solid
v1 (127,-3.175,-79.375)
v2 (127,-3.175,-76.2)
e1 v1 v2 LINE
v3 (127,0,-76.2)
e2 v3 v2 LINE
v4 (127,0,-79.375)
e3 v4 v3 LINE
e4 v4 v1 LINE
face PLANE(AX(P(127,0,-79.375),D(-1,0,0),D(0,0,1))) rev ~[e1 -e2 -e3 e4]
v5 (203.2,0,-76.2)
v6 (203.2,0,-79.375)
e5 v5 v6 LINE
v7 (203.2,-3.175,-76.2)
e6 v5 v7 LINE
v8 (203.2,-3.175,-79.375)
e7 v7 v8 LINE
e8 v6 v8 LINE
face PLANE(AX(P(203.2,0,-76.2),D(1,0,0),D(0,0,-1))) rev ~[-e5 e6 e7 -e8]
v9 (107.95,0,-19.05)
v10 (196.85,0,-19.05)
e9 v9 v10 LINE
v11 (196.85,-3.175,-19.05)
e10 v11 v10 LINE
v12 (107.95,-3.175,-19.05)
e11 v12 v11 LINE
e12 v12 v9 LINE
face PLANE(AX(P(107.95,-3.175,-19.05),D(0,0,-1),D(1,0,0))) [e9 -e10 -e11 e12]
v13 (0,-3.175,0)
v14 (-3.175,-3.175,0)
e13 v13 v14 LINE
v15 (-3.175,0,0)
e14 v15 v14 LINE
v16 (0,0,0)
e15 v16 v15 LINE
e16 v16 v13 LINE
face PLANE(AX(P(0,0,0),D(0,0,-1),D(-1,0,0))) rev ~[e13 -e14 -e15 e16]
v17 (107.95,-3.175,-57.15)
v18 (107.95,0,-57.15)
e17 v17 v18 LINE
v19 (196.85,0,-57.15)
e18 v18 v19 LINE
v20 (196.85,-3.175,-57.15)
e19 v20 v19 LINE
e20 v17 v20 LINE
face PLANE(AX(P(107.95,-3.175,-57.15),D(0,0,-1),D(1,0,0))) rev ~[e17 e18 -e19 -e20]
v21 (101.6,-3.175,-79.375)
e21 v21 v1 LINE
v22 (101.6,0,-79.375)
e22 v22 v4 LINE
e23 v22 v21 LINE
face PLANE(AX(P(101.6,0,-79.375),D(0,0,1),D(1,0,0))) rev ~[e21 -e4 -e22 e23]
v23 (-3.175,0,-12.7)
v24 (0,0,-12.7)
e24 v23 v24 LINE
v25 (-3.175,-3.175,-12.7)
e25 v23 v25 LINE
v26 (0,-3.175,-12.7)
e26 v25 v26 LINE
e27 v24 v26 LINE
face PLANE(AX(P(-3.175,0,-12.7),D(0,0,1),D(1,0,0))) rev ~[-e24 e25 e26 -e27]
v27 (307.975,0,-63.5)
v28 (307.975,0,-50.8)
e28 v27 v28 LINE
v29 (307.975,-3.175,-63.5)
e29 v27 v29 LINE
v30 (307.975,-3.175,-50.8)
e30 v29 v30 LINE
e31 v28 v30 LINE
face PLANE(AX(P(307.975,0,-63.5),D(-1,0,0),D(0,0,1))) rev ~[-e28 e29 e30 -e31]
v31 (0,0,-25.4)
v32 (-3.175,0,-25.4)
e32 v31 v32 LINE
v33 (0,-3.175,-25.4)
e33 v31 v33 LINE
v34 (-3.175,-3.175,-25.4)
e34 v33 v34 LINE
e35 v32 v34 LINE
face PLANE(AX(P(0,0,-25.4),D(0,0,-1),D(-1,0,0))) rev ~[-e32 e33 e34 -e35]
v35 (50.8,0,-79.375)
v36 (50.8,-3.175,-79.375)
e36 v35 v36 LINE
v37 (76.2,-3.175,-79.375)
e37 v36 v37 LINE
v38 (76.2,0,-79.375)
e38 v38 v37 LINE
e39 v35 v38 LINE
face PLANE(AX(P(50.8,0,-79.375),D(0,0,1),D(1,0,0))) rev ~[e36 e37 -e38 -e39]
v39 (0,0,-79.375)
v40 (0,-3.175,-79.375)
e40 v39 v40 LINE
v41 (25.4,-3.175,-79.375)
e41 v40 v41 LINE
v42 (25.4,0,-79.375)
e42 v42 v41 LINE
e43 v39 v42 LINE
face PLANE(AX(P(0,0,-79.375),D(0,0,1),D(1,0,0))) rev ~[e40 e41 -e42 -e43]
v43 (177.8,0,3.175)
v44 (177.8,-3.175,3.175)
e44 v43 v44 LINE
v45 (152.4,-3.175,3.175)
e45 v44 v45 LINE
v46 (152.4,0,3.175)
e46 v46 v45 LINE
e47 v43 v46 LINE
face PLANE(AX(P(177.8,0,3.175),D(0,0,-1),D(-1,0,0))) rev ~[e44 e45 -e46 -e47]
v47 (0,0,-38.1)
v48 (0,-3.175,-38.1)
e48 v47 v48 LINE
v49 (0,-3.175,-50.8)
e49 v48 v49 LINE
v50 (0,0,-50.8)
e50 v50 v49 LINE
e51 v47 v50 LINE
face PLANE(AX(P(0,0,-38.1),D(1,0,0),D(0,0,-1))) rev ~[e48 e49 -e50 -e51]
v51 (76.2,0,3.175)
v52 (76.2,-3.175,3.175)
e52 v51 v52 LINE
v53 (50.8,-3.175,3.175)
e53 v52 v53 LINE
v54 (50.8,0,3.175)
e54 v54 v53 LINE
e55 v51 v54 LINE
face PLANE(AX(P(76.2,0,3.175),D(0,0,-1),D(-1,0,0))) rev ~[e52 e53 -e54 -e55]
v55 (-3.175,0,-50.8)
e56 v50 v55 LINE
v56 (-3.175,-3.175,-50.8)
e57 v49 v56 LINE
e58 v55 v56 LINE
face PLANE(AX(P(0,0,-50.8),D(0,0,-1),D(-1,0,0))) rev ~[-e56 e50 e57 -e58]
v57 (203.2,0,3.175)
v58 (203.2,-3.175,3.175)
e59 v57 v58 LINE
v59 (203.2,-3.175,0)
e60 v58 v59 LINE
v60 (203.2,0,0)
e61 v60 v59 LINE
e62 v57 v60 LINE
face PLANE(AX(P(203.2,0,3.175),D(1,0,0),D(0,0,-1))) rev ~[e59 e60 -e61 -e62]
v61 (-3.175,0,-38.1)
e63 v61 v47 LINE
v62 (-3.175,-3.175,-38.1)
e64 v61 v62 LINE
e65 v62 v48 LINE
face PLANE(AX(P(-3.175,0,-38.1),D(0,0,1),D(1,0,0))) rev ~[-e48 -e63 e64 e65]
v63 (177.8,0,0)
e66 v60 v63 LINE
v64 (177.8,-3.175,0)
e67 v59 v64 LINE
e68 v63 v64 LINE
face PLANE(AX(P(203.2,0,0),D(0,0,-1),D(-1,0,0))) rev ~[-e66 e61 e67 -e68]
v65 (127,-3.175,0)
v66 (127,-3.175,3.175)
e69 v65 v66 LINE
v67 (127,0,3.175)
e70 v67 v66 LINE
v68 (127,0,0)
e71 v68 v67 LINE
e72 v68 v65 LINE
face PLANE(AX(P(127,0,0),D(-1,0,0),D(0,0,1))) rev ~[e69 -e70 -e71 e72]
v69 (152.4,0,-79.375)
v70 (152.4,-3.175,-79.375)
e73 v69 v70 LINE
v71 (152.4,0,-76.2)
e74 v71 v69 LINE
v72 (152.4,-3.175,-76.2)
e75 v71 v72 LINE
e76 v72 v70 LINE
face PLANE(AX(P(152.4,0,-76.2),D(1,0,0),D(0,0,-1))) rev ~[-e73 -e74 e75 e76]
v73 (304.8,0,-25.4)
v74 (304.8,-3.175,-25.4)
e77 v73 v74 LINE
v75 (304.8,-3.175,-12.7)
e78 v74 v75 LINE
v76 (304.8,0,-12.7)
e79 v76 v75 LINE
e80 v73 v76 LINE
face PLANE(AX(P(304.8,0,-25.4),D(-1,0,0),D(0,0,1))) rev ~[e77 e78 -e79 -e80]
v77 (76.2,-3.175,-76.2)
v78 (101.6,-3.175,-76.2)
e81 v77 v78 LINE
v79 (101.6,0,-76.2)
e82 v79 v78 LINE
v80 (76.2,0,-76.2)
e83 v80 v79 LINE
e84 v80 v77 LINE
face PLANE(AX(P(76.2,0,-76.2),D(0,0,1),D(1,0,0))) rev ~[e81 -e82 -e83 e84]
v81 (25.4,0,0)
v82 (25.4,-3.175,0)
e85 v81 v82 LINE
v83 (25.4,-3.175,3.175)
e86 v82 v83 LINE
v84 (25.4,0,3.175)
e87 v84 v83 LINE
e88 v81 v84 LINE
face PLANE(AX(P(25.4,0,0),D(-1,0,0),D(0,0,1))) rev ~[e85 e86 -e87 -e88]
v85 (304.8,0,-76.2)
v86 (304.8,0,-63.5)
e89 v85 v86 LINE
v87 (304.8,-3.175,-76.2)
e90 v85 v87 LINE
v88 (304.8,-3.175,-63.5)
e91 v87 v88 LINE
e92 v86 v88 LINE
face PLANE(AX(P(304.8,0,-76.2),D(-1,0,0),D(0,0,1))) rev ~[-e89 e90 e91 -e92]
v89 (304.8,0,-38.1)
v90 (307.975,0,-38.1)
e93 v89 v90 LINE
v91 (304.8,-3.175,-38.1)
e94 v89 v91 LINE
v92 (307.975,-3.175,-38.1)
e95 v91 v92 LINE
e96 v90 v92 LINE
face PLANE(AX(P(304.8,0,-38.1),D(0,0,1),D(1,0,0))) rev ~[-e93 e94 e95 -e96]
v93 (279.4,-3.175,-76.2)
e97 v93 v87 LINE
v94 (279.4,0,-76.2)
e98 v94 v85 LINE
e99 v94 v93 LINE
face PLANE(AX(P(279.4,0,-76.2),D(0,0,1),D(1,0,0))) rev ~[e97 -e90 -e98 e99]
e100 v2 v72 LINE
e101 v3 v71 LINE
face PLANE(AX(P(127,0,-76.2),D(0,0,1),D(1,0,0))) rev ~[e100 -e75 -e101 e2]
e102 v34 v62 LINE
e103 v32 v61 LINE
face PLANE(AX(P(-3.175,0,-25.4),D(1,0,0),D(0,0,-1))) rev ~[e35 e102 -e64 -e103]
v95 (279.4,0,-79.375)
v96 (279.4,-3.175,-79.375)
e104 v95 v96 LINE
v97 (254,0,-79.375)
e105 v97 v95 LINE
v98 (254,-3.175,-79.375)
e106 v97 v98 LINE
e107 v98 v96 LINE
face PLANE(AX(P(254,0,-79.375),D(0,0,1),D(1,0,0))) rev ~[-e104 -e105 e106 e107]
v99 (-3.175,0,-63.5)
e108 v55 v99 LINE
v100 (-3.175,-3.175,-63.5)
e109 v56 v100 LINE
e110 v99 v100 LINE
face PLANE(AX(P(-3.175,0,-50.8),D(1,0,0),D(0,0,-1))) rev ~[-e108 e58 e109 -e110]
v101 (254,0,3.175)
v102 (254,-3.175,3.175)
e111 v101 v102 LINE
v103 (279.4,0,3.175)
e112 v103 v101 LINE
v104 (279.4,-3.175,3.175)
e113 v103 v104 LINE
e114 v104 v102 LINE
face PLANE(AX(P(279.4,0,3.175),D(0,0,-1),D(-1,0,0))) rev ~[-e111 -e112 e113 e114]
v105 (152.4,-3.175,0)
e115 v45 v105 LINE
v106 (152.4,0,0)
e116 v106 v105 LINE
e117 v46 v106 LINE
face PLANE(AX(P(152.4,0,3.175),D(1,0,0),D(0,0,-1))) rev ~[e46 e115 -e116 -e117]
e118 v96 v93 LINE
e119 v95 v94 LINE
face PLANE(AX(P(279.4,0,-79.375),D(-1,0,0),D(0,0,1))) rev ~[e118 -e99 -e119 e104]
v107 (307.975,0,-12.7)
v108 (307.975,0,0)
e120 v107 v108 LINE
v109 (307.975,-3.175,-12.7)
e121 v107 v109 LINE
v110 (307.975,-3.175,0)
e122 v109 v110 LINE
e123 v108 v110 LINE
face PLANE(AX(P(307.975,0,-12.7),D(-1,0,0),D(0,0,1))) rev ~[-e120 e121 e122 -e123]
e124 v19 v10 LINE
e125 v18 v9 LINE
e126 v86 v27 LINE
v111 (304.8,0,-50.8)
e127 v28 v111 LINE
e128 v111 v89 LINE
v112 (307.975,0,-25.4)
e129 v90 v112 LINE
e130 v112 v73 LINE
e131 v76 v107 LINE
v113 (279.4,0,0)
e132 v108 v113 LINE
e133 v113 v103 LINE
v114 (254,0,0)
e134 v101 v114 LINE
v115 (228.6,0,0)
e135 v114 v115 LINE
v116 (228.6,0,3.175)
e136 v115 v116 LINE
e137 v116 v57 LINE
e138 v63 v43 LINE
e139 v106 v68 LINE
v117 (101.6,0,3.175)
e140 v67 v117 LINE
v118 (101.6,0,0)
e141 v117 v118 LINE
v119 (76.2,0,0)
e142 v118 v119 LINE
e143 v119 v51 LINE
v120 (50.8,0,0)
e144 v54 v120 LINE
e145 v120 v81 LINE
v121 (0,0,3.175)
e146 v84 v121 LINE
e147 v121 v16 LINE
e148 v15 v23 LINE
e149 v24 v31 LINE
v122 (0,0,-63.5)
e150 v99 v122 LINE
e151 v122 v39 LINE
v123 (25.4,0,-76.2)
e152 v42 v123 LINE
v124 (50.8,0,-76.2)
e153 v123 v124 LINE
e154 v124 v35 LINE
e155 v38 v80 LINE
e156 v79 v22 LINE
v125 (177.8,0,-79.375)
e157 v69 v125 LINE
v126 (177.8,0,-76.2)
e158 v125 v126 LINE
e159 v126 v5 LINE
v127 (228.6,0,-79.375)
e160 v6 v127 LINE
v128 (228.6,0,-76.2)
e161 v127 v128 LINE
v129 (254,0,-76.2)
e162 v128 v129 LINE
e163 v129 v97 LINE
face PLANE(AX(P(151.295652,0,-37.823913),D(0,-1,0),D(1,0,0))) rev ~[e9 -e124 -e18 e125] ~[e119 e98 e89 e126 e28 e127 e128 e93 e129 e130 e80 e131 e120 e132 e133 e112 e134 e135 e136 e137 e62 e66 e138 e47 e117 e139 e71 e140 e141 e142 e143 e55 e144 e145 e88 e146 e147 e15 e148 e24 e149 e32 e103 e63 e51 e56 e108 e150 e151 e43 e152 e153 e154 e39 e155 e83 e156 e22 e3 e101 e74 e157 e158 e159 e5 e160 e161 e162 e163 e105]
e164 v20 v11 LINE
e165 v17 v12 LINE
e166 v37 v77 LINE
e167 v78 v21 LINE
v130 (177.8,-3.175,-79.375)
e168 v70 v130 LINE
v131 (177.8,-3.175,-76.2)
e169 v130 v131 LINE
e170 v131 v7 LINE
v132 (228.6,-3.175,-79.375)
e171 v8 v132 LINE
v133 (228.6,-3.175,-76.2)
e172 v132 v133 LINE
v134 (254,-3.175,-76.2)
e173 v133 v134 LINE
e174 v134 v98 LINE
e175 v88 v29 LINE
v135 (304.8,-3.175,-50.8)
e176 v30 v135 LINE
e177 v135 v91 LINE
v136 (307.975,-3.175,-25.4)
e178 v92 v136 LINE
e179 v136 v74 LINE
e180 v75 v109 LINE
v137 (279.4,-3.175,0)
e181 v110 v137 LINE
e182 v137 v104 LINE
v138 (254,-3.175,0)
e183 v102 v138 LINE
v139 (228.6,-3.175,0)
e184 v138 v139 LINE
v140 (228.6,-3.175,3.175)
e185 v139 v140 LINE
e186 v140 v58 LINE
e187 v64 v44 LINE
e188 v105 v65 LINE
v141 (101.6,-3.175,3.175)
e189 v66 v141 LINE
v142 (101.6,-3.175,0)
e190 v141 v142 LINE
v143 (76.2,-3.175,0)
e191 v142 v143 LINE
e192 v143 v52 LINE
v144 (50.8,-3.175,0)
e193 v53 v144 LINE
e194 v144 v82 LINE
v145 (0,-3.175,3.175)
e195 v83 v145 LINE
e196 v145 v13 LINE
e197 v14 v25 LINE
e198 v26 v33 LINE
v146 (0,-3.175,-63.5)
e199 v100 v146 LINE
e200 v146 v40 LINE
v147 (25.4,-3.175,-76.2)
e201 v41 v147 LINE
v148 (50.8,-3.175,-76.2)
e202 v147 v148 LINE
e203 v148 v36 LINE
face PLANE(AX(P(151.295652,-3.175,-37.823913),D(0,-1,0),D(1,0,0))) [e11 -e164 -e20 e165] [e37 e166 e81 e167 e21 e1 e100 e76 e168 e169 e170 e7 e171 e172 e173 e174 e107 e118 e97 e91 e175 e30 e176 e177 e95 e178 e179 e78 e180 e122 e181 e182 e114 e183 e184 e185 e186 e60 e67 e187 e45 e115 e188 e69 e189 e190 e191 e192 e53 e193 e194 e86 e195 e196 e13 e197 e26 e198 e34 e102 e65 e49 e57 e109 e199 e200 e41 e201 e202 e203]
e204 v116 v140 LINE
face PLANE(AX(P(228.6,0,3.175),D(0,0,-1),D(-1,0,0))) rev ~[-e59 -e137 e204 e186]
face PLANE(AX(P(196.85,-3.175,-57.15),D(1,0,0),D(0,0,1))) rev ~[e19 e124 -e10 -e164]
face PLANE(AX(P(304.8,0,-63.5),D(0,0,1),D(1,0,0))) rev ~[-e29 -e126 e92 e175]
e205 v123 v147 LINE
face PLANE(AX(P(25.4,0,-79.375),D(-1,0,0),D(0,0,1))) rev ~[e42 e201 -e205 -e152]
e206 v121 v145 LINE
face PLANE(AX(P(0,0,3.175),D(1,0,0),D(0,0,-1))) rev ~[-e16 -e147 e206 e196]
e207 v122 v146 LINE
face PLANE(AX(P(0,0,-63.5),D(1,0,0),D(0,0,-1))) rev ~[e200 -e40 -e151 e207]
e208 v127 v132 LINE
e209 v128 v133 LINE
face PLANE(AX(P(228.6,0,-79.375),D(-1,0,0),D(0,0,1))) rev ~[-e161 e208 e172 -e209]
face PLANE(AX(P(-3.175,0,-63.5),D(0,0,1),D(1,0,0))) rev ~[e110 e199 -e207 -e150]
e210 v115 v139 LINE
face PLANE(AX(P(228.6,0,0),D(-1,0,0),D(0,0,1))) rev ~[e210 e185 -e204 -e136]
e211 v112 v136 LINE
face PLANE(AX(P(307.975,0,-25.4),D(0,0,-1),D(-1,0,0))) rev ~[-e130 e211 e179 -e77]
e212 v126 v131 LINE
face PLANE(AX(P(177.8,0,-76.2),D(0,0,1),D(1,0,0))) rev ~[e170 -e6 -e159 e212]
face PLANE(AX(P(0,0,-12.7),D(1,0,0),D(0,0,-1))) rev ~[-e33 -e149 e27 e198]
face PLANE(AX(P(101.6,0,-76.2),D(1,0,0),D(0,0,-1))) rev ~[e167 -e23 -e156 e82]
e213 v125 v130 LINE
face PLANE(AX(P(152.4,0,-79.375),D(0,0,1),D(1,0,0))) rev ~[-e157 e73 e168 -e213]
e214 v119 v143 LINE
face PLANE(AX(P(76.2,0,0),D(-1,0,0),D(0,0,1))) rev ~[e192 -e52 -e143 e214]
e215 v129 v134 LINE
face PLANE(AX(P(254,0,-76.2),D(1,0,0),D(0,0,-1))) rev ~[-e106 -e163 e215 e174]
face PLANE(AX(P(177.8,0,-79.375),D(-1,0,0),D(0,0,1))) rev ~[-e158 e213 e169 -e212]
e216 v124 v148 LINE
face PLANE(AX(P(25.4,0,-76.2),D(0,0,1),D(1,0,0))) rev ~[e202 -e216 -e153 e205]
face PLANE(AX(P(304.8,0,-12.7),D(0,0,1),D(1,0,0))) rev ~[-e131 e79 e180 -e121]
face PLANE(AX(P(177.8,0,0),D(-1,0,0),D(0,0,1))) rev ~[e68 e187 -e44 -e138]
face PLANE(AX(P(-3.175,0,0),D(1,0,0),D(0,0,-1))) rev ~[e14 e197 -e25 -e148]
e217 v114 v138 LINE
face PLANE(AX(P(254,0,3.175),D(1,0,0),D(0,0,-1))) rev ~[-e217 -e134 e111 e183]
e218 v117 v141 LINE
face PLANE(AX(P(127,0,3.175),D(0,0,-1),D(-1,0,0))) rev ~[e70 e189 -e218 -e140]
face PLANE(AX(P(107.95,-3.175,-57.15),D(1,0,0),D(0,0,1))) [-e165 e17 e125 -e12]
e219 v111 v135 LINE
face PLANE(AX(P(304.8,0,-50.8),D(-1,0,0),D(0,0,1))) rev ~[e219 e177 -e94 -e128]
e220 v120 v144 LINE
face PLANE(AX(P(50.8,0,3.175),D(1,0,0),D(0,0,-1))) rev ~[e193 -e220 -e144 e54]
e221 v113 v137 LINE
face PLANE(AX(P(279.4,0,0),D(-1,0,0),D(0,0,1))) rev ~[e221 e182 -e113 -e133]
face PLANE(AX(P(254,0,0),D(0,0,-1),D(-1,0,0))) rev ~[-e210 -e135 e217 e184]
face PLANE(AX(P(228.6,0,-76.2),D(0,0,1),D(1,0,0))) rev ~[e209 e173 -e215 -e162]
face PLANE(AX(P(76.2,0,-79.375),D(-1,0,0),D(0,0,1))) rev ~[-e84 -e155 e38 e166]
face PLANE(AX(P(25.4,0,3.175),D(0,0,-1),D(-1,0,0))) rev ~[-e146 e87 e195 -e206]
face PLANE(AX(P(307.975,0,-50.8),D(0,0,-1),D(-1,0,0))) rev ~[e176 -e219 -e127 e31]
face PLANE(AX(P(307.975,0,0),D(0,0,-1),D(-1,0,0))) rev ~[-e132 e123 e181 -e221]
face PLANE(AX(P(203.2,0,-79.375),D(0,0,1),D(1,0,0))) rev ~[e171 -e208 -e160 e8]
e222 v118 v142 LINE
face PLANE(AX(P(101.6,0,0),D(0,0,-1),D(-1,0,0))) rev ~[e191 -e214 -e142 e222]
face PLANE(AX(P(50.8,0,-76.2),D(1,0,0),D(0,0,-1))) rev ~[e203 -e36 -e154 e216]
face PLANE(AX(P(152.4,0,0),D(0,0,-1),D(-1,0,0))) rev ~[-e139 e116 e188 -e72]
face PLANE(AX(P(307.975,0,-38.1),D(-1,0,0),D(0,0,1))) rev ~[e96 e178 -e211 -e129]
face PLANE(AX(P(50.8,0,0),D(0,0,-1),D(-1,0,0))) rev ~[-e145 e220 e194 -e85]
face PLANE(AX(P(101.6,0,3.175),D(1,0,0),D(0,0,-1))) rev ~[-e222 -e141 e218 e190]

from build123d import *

# Parameters (mm, degrees)
F1_DEPTH = 3.175
F2_W     = 88.9
F2_H     = 38.1
F3_DEPTH = 25.4


# Not quite as in the source:
# - a length typed as a fraction of an inch, garbled in the dataset ("3 / 203.2 mm" for 3/8 in), is restored


with BuildPart() as f1:
    # F0 (on Front) → F1 (new body)
    with BuildSketch(Plane.XZ):
        Polygon((50.8, 0), (25.4, 0), (25.4, 3.175), (0, 3.175), (0, 0), (-3.175, 0), (-3.175, -12.7), (0, -12.7), (0, -25.4), (-3.175, -25.4), (-3.175, -38.1), (0, -38.1), (0, -50.8), (-3.175, -50.8), (-3.175, -63.5), (0, -63.5), (0, -76.2), (0, -79.375), (25.4, -79.375), (25.4, -76.2), (50.8, -76.2), (50.8, -79.375), (76.2, -79.375), (76.2, -76.2), (101.6, -76.2), (101.6, -79.375), (127, -79.375), (127, -76.2), (152.4, -76.2), (152.4, -79.375), (177.8, -79.375), (177.8, -76.2), (203.2, -76.2), (203.2, -79.375), (228.6, -79.375), (228.6, -76.2), (254, -76.2), (254, -79.375), (279.4, -79.375), (279.4, -76.2), (304.8, -76.2), (304.8, -63.5), (307.975, -63.5), (307.975, -50.8), (304.8, -50.8), (304.8, -38.1), (307.975, -38.1), (307.975, -25.4), (304.8, -25.4), (304.8, -12.7), (307.975, -12.7), (307.975, 0), (304.8, 0), (279.4, 0), (279.4, 3.175), (254, 3.175), (254, 0), (228.6, 0), (228.6, 3.175), (203.2, 3.175), (203.2, 0), (177.8, 0), (177.8, 3.175), (152.4, 3.175), (152.4, 0), (127, 0), (127, 3.175), (101.6, 3.175), (101.6, 0), (76.2, 0), (76.2, 3.175), (50.8, 3.175), align=None)
    extrude(amount=F1_DEPTH)

    # F2 (on face) → F3 (cut)
    with BuildSketch(Plane.XZ.offset(3.175)):
        with Locations((152.4, -38.1)):
            Rectangle(F2_W, F2_H)
    extrude(amount=-F3_DEPTH, mode=Mode.SUBTRACT)


solid = f1.part
